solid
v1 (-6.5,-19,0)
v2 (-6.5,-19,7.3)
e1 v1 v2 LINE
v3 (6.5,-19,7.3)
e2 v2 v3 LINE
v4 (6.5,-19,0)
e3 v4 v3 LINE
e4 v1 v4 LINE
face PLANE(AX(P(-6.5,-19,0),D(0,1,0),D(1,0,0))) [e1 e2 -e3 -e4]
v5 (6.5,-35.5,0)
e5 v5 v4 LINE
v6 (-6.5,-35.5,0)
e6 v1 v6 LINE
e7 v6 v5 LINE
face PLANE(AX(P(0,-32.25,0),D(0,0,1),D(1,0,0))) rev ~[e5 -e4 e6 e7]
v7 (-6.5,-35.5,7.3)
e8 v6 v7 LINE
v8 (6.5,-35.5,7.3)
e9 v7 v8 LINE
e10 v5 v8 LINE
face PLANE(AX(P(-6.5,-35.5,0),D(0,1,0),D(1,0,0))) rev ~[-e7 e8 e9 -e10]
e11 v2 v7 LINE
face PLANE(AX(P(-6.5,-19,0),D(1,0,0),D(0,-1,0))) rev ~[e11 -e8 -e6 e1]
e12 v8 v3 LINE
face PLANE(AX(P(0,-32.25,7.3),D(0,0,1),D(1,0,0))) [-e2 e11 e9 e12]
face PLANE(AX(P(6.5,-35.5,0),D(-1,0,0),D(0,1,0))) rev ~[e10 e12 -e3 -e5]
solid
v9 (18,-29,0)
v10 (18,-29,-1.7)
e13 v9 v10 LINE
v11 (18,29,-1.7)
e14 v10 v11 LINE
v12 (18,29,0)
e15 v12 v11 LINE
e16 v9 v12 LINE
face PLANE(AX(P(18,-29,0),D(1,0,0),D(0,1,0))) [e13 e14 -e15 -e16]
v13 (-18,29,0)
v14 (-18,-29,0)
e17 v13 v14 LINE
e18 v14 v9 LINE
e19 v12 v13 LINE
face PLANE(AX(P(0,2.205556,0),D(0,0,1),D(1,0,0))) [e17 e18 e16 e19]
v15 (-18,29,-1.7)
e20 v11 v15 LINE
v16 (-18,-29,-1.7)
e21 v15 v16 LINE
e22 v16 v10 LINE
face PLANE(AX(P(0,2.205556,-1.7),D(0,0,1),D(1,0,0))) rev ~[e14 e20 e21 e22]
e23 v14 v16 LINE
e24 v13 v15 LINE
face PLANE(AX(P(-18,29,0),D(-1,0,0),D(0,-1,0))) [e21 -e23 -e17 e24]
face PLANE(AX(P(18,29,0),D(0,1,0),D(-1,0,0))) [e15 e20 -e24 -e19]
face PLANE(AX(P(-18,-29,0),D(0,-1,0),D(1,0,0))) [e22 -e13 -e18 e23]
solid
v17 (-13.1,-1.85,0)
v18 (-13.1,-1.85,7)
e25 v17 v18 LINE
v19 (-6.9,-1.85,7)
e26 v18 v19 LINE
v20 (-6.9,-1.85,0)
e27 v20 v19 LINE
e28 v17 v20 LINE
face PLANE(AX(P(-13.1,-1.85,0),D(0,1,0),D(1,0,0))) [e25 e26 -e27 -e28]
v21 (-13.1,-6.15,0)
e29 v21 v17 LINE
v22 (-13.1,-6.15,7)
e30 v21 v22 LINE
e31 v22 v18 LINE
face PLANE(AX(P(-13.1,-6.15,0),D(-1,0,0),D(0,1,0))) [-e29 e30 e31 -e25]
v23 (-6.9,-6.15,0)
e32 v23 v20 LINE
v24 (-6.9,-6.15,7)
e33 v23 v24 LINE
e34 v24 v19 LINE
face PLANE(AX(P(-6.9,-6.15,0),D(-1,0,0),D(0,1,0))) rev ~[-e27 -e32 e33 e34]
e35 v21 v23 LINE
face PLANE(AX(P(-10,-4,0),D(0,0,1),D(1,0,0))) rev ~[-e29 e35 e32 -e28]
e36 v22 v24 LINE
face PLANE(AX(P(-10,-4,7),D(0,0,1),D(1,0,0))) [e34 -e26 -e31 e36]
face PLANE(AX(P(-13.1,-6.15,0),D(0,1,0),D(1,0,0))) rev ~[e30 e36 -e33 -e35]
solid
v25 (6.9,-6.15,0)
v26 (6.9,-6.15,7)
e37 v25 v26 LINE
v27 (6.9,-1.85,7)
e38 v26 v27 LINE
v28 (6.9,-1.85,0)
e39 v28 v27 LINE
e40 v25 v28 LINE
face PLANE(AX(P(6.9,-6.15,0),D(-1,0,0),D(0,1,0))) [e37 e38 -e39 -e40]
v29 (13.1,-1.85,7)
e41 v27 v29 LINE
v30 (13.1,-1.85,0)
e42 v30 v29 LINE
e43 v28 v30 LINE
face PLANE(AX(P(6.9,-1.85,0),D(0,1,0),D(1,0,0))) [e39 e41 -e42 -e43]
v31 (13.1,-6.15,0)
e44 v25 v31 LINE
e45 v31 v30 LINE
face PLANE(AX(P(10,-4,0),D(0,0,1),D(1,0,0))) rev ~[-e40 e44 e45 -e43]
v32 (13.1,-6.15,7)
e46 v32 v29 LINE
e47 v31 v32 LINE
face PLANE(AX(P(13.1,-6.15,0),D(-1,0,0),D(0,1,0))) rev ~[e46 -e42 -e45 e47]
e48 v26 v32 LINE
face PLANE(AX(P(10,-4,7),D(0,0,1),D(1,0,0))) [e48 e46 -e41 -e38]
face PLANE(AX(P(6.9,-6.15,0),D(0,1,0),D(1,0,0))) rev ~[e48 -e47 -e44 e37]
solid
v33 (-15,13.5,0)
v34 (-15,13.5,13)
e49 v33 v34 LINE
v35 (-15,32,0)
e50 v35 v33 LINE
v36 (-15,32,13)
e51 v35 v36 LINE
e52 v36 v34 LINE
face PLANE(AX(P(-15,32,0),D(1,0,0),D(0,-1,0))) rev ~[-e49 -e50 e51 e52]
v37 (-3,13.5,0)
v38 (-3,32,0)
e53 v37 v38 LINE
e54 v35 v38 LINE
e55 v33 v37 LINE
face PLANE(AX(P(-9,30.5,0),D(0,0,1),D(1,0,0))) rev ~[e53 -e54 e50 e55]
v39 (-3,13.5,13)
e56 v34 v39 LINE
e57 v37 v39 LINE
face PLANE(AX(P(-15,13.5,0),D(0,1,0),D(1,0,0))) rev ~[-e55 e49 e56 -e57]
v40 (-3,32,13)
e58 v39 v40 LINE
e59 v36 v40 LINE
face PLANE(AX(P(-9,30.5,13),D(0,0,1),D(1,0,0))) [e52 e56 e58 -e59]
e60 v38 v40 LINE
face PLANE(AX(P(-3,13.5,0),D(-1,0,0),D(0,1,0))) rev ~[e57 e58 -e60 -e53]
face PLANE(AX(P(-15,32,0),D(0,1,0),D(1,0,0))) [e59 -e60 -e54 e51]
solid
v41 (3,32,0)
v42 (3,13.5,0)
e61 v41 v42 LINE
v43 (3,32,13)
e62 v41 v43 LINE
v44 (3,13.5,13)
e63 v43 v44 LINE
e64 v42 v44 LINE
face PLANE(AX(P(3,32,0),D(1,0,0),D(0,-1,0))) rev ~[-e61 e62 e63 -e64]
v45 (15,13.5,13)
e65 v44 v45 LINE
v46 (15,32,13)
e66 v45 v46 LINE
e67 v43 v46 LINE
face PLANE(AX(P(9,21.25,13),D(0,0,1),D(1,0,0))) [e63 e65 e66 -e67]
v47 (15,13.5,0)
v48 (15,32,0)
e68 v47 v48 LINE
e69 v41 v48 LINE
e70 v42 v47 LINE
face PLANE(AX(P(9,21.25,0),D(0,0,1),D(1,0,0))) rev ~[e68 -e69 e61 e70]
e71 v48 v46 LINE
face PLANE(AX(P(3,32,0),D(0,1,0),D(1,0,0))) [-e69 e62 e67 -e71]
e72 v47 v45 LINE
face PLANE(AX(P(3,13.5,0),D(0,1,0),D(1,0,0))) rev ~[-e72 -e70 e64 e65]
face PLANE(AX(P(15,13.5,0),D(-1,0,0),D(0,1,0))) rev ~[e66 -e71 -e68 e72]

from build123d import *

# Parameters (mm, degrees)
F0_W     = 6.2
F0_H     = 4.3
F0_W_2   = 12
F0_H_2   = 15.5
F0_W_3   = 13
F0_H_3   = 10
F1_DEPTH = 1.7
F0_H_4   = 6.5
F2_DEPTH = 7.3
F0_H_5   = 3
F3_DEPTH = 13
F4_DEPTH = 7


with BuildPart() as f1:
    # F0 (on Top) → F1 (new body)
    with BuildSketch(Plane.XY):
        Polygon((18, -29), (18, 29), (15, 29), (15, 13.5), (3, 13.5), (3, 29), (-3, 29), (-3, 13.5), (-15, 13.5), (-15, 29), (-18, 29), (-18, -29), (-6.5, -29), (-6.5, -19), (6.5, -19), (6.5, -29), align=None)
        with Locations((-10, -4)):
            Rectangle(F0_W, F0_H, mode=Mode.SUBTRACT)
        with Locations((10, -4)):
            Rectangle(F0_W, F0_H, mode=Mode.SUBTRACT)
        with Locations((9, 21.25)):
            Rectangle(F0_W_2, F0_H_2)
        with Locations((-9, 21.25)):
            Rectangle(F0_W_2, F0_H_2)
        with Locations((0, -24)):
            Rectangle(F0_W_3, F0_H_3)
        with Locations((10, -4)):
            Rectangle(F0_W, F0_H)
        with Locations((-10, -4)):
            Rectangle(F0_W, F0_H)
    extrude(amount=-F1_DEPTH)


with BuildPart() as f2:
    # F0 (on Top) → F2 (new body)
    with BuildSketch(Plane.XY):
        with Locations((0, -32.25)):
            Rectangle(F0_W_3, F0_H_4)
        with Locations((0, -24)):
            Rectangle(F0_W_3, F0_H_3)
    extrude(amount=F2_DEPTH)


with BuildPart() as f3:
    # F0 (on Top) → F3 (new body)
    with BuildSketch(Plane.XY):
        with Locations((-9, 30.5)):
            Rectangle(F0_W_2, F0_H_5)
        with Locations((-9, 21.25)):
            Rectangle(F0_W_2, F0_H_2)
    extrude(amount=F3_DEPTH)


with BuildPart() as f3b:
    # F0 (on Top) → F3, piece 2 (new body)
    with BuildSketch(Plane.XY):
        with Locations((9, 21.25)):
            Rectangle(F0_W_2, F0_H_2)
        with Locations((9, 30.5)):
            Rectangle(F0_W_2, F0_H_5)
    extrude(amount=F3_DEPTH)


with BuildPart() as f4:
    # F0 (on Top) → F4 (new body)
    with BuildSketch(Plane.XY):
        with Locations((10, -4)):
            Rectangle(F0_W, F0_H)
    extrude(amount=F4_DEPTH)


with BuildPart() as f4b:
    # F0 (on Top) → F4, piece 2 (new body)
    with BuildSketch(Plane.XY):
        with Locations((-10, -4)):
            Rectangle(F0_W, F0_H)
    extrude(amount=F4_DEPTH)


solid = Compound([f1.part, f2.part, f3.part, f3b.part, f4.part, f4b.part])
